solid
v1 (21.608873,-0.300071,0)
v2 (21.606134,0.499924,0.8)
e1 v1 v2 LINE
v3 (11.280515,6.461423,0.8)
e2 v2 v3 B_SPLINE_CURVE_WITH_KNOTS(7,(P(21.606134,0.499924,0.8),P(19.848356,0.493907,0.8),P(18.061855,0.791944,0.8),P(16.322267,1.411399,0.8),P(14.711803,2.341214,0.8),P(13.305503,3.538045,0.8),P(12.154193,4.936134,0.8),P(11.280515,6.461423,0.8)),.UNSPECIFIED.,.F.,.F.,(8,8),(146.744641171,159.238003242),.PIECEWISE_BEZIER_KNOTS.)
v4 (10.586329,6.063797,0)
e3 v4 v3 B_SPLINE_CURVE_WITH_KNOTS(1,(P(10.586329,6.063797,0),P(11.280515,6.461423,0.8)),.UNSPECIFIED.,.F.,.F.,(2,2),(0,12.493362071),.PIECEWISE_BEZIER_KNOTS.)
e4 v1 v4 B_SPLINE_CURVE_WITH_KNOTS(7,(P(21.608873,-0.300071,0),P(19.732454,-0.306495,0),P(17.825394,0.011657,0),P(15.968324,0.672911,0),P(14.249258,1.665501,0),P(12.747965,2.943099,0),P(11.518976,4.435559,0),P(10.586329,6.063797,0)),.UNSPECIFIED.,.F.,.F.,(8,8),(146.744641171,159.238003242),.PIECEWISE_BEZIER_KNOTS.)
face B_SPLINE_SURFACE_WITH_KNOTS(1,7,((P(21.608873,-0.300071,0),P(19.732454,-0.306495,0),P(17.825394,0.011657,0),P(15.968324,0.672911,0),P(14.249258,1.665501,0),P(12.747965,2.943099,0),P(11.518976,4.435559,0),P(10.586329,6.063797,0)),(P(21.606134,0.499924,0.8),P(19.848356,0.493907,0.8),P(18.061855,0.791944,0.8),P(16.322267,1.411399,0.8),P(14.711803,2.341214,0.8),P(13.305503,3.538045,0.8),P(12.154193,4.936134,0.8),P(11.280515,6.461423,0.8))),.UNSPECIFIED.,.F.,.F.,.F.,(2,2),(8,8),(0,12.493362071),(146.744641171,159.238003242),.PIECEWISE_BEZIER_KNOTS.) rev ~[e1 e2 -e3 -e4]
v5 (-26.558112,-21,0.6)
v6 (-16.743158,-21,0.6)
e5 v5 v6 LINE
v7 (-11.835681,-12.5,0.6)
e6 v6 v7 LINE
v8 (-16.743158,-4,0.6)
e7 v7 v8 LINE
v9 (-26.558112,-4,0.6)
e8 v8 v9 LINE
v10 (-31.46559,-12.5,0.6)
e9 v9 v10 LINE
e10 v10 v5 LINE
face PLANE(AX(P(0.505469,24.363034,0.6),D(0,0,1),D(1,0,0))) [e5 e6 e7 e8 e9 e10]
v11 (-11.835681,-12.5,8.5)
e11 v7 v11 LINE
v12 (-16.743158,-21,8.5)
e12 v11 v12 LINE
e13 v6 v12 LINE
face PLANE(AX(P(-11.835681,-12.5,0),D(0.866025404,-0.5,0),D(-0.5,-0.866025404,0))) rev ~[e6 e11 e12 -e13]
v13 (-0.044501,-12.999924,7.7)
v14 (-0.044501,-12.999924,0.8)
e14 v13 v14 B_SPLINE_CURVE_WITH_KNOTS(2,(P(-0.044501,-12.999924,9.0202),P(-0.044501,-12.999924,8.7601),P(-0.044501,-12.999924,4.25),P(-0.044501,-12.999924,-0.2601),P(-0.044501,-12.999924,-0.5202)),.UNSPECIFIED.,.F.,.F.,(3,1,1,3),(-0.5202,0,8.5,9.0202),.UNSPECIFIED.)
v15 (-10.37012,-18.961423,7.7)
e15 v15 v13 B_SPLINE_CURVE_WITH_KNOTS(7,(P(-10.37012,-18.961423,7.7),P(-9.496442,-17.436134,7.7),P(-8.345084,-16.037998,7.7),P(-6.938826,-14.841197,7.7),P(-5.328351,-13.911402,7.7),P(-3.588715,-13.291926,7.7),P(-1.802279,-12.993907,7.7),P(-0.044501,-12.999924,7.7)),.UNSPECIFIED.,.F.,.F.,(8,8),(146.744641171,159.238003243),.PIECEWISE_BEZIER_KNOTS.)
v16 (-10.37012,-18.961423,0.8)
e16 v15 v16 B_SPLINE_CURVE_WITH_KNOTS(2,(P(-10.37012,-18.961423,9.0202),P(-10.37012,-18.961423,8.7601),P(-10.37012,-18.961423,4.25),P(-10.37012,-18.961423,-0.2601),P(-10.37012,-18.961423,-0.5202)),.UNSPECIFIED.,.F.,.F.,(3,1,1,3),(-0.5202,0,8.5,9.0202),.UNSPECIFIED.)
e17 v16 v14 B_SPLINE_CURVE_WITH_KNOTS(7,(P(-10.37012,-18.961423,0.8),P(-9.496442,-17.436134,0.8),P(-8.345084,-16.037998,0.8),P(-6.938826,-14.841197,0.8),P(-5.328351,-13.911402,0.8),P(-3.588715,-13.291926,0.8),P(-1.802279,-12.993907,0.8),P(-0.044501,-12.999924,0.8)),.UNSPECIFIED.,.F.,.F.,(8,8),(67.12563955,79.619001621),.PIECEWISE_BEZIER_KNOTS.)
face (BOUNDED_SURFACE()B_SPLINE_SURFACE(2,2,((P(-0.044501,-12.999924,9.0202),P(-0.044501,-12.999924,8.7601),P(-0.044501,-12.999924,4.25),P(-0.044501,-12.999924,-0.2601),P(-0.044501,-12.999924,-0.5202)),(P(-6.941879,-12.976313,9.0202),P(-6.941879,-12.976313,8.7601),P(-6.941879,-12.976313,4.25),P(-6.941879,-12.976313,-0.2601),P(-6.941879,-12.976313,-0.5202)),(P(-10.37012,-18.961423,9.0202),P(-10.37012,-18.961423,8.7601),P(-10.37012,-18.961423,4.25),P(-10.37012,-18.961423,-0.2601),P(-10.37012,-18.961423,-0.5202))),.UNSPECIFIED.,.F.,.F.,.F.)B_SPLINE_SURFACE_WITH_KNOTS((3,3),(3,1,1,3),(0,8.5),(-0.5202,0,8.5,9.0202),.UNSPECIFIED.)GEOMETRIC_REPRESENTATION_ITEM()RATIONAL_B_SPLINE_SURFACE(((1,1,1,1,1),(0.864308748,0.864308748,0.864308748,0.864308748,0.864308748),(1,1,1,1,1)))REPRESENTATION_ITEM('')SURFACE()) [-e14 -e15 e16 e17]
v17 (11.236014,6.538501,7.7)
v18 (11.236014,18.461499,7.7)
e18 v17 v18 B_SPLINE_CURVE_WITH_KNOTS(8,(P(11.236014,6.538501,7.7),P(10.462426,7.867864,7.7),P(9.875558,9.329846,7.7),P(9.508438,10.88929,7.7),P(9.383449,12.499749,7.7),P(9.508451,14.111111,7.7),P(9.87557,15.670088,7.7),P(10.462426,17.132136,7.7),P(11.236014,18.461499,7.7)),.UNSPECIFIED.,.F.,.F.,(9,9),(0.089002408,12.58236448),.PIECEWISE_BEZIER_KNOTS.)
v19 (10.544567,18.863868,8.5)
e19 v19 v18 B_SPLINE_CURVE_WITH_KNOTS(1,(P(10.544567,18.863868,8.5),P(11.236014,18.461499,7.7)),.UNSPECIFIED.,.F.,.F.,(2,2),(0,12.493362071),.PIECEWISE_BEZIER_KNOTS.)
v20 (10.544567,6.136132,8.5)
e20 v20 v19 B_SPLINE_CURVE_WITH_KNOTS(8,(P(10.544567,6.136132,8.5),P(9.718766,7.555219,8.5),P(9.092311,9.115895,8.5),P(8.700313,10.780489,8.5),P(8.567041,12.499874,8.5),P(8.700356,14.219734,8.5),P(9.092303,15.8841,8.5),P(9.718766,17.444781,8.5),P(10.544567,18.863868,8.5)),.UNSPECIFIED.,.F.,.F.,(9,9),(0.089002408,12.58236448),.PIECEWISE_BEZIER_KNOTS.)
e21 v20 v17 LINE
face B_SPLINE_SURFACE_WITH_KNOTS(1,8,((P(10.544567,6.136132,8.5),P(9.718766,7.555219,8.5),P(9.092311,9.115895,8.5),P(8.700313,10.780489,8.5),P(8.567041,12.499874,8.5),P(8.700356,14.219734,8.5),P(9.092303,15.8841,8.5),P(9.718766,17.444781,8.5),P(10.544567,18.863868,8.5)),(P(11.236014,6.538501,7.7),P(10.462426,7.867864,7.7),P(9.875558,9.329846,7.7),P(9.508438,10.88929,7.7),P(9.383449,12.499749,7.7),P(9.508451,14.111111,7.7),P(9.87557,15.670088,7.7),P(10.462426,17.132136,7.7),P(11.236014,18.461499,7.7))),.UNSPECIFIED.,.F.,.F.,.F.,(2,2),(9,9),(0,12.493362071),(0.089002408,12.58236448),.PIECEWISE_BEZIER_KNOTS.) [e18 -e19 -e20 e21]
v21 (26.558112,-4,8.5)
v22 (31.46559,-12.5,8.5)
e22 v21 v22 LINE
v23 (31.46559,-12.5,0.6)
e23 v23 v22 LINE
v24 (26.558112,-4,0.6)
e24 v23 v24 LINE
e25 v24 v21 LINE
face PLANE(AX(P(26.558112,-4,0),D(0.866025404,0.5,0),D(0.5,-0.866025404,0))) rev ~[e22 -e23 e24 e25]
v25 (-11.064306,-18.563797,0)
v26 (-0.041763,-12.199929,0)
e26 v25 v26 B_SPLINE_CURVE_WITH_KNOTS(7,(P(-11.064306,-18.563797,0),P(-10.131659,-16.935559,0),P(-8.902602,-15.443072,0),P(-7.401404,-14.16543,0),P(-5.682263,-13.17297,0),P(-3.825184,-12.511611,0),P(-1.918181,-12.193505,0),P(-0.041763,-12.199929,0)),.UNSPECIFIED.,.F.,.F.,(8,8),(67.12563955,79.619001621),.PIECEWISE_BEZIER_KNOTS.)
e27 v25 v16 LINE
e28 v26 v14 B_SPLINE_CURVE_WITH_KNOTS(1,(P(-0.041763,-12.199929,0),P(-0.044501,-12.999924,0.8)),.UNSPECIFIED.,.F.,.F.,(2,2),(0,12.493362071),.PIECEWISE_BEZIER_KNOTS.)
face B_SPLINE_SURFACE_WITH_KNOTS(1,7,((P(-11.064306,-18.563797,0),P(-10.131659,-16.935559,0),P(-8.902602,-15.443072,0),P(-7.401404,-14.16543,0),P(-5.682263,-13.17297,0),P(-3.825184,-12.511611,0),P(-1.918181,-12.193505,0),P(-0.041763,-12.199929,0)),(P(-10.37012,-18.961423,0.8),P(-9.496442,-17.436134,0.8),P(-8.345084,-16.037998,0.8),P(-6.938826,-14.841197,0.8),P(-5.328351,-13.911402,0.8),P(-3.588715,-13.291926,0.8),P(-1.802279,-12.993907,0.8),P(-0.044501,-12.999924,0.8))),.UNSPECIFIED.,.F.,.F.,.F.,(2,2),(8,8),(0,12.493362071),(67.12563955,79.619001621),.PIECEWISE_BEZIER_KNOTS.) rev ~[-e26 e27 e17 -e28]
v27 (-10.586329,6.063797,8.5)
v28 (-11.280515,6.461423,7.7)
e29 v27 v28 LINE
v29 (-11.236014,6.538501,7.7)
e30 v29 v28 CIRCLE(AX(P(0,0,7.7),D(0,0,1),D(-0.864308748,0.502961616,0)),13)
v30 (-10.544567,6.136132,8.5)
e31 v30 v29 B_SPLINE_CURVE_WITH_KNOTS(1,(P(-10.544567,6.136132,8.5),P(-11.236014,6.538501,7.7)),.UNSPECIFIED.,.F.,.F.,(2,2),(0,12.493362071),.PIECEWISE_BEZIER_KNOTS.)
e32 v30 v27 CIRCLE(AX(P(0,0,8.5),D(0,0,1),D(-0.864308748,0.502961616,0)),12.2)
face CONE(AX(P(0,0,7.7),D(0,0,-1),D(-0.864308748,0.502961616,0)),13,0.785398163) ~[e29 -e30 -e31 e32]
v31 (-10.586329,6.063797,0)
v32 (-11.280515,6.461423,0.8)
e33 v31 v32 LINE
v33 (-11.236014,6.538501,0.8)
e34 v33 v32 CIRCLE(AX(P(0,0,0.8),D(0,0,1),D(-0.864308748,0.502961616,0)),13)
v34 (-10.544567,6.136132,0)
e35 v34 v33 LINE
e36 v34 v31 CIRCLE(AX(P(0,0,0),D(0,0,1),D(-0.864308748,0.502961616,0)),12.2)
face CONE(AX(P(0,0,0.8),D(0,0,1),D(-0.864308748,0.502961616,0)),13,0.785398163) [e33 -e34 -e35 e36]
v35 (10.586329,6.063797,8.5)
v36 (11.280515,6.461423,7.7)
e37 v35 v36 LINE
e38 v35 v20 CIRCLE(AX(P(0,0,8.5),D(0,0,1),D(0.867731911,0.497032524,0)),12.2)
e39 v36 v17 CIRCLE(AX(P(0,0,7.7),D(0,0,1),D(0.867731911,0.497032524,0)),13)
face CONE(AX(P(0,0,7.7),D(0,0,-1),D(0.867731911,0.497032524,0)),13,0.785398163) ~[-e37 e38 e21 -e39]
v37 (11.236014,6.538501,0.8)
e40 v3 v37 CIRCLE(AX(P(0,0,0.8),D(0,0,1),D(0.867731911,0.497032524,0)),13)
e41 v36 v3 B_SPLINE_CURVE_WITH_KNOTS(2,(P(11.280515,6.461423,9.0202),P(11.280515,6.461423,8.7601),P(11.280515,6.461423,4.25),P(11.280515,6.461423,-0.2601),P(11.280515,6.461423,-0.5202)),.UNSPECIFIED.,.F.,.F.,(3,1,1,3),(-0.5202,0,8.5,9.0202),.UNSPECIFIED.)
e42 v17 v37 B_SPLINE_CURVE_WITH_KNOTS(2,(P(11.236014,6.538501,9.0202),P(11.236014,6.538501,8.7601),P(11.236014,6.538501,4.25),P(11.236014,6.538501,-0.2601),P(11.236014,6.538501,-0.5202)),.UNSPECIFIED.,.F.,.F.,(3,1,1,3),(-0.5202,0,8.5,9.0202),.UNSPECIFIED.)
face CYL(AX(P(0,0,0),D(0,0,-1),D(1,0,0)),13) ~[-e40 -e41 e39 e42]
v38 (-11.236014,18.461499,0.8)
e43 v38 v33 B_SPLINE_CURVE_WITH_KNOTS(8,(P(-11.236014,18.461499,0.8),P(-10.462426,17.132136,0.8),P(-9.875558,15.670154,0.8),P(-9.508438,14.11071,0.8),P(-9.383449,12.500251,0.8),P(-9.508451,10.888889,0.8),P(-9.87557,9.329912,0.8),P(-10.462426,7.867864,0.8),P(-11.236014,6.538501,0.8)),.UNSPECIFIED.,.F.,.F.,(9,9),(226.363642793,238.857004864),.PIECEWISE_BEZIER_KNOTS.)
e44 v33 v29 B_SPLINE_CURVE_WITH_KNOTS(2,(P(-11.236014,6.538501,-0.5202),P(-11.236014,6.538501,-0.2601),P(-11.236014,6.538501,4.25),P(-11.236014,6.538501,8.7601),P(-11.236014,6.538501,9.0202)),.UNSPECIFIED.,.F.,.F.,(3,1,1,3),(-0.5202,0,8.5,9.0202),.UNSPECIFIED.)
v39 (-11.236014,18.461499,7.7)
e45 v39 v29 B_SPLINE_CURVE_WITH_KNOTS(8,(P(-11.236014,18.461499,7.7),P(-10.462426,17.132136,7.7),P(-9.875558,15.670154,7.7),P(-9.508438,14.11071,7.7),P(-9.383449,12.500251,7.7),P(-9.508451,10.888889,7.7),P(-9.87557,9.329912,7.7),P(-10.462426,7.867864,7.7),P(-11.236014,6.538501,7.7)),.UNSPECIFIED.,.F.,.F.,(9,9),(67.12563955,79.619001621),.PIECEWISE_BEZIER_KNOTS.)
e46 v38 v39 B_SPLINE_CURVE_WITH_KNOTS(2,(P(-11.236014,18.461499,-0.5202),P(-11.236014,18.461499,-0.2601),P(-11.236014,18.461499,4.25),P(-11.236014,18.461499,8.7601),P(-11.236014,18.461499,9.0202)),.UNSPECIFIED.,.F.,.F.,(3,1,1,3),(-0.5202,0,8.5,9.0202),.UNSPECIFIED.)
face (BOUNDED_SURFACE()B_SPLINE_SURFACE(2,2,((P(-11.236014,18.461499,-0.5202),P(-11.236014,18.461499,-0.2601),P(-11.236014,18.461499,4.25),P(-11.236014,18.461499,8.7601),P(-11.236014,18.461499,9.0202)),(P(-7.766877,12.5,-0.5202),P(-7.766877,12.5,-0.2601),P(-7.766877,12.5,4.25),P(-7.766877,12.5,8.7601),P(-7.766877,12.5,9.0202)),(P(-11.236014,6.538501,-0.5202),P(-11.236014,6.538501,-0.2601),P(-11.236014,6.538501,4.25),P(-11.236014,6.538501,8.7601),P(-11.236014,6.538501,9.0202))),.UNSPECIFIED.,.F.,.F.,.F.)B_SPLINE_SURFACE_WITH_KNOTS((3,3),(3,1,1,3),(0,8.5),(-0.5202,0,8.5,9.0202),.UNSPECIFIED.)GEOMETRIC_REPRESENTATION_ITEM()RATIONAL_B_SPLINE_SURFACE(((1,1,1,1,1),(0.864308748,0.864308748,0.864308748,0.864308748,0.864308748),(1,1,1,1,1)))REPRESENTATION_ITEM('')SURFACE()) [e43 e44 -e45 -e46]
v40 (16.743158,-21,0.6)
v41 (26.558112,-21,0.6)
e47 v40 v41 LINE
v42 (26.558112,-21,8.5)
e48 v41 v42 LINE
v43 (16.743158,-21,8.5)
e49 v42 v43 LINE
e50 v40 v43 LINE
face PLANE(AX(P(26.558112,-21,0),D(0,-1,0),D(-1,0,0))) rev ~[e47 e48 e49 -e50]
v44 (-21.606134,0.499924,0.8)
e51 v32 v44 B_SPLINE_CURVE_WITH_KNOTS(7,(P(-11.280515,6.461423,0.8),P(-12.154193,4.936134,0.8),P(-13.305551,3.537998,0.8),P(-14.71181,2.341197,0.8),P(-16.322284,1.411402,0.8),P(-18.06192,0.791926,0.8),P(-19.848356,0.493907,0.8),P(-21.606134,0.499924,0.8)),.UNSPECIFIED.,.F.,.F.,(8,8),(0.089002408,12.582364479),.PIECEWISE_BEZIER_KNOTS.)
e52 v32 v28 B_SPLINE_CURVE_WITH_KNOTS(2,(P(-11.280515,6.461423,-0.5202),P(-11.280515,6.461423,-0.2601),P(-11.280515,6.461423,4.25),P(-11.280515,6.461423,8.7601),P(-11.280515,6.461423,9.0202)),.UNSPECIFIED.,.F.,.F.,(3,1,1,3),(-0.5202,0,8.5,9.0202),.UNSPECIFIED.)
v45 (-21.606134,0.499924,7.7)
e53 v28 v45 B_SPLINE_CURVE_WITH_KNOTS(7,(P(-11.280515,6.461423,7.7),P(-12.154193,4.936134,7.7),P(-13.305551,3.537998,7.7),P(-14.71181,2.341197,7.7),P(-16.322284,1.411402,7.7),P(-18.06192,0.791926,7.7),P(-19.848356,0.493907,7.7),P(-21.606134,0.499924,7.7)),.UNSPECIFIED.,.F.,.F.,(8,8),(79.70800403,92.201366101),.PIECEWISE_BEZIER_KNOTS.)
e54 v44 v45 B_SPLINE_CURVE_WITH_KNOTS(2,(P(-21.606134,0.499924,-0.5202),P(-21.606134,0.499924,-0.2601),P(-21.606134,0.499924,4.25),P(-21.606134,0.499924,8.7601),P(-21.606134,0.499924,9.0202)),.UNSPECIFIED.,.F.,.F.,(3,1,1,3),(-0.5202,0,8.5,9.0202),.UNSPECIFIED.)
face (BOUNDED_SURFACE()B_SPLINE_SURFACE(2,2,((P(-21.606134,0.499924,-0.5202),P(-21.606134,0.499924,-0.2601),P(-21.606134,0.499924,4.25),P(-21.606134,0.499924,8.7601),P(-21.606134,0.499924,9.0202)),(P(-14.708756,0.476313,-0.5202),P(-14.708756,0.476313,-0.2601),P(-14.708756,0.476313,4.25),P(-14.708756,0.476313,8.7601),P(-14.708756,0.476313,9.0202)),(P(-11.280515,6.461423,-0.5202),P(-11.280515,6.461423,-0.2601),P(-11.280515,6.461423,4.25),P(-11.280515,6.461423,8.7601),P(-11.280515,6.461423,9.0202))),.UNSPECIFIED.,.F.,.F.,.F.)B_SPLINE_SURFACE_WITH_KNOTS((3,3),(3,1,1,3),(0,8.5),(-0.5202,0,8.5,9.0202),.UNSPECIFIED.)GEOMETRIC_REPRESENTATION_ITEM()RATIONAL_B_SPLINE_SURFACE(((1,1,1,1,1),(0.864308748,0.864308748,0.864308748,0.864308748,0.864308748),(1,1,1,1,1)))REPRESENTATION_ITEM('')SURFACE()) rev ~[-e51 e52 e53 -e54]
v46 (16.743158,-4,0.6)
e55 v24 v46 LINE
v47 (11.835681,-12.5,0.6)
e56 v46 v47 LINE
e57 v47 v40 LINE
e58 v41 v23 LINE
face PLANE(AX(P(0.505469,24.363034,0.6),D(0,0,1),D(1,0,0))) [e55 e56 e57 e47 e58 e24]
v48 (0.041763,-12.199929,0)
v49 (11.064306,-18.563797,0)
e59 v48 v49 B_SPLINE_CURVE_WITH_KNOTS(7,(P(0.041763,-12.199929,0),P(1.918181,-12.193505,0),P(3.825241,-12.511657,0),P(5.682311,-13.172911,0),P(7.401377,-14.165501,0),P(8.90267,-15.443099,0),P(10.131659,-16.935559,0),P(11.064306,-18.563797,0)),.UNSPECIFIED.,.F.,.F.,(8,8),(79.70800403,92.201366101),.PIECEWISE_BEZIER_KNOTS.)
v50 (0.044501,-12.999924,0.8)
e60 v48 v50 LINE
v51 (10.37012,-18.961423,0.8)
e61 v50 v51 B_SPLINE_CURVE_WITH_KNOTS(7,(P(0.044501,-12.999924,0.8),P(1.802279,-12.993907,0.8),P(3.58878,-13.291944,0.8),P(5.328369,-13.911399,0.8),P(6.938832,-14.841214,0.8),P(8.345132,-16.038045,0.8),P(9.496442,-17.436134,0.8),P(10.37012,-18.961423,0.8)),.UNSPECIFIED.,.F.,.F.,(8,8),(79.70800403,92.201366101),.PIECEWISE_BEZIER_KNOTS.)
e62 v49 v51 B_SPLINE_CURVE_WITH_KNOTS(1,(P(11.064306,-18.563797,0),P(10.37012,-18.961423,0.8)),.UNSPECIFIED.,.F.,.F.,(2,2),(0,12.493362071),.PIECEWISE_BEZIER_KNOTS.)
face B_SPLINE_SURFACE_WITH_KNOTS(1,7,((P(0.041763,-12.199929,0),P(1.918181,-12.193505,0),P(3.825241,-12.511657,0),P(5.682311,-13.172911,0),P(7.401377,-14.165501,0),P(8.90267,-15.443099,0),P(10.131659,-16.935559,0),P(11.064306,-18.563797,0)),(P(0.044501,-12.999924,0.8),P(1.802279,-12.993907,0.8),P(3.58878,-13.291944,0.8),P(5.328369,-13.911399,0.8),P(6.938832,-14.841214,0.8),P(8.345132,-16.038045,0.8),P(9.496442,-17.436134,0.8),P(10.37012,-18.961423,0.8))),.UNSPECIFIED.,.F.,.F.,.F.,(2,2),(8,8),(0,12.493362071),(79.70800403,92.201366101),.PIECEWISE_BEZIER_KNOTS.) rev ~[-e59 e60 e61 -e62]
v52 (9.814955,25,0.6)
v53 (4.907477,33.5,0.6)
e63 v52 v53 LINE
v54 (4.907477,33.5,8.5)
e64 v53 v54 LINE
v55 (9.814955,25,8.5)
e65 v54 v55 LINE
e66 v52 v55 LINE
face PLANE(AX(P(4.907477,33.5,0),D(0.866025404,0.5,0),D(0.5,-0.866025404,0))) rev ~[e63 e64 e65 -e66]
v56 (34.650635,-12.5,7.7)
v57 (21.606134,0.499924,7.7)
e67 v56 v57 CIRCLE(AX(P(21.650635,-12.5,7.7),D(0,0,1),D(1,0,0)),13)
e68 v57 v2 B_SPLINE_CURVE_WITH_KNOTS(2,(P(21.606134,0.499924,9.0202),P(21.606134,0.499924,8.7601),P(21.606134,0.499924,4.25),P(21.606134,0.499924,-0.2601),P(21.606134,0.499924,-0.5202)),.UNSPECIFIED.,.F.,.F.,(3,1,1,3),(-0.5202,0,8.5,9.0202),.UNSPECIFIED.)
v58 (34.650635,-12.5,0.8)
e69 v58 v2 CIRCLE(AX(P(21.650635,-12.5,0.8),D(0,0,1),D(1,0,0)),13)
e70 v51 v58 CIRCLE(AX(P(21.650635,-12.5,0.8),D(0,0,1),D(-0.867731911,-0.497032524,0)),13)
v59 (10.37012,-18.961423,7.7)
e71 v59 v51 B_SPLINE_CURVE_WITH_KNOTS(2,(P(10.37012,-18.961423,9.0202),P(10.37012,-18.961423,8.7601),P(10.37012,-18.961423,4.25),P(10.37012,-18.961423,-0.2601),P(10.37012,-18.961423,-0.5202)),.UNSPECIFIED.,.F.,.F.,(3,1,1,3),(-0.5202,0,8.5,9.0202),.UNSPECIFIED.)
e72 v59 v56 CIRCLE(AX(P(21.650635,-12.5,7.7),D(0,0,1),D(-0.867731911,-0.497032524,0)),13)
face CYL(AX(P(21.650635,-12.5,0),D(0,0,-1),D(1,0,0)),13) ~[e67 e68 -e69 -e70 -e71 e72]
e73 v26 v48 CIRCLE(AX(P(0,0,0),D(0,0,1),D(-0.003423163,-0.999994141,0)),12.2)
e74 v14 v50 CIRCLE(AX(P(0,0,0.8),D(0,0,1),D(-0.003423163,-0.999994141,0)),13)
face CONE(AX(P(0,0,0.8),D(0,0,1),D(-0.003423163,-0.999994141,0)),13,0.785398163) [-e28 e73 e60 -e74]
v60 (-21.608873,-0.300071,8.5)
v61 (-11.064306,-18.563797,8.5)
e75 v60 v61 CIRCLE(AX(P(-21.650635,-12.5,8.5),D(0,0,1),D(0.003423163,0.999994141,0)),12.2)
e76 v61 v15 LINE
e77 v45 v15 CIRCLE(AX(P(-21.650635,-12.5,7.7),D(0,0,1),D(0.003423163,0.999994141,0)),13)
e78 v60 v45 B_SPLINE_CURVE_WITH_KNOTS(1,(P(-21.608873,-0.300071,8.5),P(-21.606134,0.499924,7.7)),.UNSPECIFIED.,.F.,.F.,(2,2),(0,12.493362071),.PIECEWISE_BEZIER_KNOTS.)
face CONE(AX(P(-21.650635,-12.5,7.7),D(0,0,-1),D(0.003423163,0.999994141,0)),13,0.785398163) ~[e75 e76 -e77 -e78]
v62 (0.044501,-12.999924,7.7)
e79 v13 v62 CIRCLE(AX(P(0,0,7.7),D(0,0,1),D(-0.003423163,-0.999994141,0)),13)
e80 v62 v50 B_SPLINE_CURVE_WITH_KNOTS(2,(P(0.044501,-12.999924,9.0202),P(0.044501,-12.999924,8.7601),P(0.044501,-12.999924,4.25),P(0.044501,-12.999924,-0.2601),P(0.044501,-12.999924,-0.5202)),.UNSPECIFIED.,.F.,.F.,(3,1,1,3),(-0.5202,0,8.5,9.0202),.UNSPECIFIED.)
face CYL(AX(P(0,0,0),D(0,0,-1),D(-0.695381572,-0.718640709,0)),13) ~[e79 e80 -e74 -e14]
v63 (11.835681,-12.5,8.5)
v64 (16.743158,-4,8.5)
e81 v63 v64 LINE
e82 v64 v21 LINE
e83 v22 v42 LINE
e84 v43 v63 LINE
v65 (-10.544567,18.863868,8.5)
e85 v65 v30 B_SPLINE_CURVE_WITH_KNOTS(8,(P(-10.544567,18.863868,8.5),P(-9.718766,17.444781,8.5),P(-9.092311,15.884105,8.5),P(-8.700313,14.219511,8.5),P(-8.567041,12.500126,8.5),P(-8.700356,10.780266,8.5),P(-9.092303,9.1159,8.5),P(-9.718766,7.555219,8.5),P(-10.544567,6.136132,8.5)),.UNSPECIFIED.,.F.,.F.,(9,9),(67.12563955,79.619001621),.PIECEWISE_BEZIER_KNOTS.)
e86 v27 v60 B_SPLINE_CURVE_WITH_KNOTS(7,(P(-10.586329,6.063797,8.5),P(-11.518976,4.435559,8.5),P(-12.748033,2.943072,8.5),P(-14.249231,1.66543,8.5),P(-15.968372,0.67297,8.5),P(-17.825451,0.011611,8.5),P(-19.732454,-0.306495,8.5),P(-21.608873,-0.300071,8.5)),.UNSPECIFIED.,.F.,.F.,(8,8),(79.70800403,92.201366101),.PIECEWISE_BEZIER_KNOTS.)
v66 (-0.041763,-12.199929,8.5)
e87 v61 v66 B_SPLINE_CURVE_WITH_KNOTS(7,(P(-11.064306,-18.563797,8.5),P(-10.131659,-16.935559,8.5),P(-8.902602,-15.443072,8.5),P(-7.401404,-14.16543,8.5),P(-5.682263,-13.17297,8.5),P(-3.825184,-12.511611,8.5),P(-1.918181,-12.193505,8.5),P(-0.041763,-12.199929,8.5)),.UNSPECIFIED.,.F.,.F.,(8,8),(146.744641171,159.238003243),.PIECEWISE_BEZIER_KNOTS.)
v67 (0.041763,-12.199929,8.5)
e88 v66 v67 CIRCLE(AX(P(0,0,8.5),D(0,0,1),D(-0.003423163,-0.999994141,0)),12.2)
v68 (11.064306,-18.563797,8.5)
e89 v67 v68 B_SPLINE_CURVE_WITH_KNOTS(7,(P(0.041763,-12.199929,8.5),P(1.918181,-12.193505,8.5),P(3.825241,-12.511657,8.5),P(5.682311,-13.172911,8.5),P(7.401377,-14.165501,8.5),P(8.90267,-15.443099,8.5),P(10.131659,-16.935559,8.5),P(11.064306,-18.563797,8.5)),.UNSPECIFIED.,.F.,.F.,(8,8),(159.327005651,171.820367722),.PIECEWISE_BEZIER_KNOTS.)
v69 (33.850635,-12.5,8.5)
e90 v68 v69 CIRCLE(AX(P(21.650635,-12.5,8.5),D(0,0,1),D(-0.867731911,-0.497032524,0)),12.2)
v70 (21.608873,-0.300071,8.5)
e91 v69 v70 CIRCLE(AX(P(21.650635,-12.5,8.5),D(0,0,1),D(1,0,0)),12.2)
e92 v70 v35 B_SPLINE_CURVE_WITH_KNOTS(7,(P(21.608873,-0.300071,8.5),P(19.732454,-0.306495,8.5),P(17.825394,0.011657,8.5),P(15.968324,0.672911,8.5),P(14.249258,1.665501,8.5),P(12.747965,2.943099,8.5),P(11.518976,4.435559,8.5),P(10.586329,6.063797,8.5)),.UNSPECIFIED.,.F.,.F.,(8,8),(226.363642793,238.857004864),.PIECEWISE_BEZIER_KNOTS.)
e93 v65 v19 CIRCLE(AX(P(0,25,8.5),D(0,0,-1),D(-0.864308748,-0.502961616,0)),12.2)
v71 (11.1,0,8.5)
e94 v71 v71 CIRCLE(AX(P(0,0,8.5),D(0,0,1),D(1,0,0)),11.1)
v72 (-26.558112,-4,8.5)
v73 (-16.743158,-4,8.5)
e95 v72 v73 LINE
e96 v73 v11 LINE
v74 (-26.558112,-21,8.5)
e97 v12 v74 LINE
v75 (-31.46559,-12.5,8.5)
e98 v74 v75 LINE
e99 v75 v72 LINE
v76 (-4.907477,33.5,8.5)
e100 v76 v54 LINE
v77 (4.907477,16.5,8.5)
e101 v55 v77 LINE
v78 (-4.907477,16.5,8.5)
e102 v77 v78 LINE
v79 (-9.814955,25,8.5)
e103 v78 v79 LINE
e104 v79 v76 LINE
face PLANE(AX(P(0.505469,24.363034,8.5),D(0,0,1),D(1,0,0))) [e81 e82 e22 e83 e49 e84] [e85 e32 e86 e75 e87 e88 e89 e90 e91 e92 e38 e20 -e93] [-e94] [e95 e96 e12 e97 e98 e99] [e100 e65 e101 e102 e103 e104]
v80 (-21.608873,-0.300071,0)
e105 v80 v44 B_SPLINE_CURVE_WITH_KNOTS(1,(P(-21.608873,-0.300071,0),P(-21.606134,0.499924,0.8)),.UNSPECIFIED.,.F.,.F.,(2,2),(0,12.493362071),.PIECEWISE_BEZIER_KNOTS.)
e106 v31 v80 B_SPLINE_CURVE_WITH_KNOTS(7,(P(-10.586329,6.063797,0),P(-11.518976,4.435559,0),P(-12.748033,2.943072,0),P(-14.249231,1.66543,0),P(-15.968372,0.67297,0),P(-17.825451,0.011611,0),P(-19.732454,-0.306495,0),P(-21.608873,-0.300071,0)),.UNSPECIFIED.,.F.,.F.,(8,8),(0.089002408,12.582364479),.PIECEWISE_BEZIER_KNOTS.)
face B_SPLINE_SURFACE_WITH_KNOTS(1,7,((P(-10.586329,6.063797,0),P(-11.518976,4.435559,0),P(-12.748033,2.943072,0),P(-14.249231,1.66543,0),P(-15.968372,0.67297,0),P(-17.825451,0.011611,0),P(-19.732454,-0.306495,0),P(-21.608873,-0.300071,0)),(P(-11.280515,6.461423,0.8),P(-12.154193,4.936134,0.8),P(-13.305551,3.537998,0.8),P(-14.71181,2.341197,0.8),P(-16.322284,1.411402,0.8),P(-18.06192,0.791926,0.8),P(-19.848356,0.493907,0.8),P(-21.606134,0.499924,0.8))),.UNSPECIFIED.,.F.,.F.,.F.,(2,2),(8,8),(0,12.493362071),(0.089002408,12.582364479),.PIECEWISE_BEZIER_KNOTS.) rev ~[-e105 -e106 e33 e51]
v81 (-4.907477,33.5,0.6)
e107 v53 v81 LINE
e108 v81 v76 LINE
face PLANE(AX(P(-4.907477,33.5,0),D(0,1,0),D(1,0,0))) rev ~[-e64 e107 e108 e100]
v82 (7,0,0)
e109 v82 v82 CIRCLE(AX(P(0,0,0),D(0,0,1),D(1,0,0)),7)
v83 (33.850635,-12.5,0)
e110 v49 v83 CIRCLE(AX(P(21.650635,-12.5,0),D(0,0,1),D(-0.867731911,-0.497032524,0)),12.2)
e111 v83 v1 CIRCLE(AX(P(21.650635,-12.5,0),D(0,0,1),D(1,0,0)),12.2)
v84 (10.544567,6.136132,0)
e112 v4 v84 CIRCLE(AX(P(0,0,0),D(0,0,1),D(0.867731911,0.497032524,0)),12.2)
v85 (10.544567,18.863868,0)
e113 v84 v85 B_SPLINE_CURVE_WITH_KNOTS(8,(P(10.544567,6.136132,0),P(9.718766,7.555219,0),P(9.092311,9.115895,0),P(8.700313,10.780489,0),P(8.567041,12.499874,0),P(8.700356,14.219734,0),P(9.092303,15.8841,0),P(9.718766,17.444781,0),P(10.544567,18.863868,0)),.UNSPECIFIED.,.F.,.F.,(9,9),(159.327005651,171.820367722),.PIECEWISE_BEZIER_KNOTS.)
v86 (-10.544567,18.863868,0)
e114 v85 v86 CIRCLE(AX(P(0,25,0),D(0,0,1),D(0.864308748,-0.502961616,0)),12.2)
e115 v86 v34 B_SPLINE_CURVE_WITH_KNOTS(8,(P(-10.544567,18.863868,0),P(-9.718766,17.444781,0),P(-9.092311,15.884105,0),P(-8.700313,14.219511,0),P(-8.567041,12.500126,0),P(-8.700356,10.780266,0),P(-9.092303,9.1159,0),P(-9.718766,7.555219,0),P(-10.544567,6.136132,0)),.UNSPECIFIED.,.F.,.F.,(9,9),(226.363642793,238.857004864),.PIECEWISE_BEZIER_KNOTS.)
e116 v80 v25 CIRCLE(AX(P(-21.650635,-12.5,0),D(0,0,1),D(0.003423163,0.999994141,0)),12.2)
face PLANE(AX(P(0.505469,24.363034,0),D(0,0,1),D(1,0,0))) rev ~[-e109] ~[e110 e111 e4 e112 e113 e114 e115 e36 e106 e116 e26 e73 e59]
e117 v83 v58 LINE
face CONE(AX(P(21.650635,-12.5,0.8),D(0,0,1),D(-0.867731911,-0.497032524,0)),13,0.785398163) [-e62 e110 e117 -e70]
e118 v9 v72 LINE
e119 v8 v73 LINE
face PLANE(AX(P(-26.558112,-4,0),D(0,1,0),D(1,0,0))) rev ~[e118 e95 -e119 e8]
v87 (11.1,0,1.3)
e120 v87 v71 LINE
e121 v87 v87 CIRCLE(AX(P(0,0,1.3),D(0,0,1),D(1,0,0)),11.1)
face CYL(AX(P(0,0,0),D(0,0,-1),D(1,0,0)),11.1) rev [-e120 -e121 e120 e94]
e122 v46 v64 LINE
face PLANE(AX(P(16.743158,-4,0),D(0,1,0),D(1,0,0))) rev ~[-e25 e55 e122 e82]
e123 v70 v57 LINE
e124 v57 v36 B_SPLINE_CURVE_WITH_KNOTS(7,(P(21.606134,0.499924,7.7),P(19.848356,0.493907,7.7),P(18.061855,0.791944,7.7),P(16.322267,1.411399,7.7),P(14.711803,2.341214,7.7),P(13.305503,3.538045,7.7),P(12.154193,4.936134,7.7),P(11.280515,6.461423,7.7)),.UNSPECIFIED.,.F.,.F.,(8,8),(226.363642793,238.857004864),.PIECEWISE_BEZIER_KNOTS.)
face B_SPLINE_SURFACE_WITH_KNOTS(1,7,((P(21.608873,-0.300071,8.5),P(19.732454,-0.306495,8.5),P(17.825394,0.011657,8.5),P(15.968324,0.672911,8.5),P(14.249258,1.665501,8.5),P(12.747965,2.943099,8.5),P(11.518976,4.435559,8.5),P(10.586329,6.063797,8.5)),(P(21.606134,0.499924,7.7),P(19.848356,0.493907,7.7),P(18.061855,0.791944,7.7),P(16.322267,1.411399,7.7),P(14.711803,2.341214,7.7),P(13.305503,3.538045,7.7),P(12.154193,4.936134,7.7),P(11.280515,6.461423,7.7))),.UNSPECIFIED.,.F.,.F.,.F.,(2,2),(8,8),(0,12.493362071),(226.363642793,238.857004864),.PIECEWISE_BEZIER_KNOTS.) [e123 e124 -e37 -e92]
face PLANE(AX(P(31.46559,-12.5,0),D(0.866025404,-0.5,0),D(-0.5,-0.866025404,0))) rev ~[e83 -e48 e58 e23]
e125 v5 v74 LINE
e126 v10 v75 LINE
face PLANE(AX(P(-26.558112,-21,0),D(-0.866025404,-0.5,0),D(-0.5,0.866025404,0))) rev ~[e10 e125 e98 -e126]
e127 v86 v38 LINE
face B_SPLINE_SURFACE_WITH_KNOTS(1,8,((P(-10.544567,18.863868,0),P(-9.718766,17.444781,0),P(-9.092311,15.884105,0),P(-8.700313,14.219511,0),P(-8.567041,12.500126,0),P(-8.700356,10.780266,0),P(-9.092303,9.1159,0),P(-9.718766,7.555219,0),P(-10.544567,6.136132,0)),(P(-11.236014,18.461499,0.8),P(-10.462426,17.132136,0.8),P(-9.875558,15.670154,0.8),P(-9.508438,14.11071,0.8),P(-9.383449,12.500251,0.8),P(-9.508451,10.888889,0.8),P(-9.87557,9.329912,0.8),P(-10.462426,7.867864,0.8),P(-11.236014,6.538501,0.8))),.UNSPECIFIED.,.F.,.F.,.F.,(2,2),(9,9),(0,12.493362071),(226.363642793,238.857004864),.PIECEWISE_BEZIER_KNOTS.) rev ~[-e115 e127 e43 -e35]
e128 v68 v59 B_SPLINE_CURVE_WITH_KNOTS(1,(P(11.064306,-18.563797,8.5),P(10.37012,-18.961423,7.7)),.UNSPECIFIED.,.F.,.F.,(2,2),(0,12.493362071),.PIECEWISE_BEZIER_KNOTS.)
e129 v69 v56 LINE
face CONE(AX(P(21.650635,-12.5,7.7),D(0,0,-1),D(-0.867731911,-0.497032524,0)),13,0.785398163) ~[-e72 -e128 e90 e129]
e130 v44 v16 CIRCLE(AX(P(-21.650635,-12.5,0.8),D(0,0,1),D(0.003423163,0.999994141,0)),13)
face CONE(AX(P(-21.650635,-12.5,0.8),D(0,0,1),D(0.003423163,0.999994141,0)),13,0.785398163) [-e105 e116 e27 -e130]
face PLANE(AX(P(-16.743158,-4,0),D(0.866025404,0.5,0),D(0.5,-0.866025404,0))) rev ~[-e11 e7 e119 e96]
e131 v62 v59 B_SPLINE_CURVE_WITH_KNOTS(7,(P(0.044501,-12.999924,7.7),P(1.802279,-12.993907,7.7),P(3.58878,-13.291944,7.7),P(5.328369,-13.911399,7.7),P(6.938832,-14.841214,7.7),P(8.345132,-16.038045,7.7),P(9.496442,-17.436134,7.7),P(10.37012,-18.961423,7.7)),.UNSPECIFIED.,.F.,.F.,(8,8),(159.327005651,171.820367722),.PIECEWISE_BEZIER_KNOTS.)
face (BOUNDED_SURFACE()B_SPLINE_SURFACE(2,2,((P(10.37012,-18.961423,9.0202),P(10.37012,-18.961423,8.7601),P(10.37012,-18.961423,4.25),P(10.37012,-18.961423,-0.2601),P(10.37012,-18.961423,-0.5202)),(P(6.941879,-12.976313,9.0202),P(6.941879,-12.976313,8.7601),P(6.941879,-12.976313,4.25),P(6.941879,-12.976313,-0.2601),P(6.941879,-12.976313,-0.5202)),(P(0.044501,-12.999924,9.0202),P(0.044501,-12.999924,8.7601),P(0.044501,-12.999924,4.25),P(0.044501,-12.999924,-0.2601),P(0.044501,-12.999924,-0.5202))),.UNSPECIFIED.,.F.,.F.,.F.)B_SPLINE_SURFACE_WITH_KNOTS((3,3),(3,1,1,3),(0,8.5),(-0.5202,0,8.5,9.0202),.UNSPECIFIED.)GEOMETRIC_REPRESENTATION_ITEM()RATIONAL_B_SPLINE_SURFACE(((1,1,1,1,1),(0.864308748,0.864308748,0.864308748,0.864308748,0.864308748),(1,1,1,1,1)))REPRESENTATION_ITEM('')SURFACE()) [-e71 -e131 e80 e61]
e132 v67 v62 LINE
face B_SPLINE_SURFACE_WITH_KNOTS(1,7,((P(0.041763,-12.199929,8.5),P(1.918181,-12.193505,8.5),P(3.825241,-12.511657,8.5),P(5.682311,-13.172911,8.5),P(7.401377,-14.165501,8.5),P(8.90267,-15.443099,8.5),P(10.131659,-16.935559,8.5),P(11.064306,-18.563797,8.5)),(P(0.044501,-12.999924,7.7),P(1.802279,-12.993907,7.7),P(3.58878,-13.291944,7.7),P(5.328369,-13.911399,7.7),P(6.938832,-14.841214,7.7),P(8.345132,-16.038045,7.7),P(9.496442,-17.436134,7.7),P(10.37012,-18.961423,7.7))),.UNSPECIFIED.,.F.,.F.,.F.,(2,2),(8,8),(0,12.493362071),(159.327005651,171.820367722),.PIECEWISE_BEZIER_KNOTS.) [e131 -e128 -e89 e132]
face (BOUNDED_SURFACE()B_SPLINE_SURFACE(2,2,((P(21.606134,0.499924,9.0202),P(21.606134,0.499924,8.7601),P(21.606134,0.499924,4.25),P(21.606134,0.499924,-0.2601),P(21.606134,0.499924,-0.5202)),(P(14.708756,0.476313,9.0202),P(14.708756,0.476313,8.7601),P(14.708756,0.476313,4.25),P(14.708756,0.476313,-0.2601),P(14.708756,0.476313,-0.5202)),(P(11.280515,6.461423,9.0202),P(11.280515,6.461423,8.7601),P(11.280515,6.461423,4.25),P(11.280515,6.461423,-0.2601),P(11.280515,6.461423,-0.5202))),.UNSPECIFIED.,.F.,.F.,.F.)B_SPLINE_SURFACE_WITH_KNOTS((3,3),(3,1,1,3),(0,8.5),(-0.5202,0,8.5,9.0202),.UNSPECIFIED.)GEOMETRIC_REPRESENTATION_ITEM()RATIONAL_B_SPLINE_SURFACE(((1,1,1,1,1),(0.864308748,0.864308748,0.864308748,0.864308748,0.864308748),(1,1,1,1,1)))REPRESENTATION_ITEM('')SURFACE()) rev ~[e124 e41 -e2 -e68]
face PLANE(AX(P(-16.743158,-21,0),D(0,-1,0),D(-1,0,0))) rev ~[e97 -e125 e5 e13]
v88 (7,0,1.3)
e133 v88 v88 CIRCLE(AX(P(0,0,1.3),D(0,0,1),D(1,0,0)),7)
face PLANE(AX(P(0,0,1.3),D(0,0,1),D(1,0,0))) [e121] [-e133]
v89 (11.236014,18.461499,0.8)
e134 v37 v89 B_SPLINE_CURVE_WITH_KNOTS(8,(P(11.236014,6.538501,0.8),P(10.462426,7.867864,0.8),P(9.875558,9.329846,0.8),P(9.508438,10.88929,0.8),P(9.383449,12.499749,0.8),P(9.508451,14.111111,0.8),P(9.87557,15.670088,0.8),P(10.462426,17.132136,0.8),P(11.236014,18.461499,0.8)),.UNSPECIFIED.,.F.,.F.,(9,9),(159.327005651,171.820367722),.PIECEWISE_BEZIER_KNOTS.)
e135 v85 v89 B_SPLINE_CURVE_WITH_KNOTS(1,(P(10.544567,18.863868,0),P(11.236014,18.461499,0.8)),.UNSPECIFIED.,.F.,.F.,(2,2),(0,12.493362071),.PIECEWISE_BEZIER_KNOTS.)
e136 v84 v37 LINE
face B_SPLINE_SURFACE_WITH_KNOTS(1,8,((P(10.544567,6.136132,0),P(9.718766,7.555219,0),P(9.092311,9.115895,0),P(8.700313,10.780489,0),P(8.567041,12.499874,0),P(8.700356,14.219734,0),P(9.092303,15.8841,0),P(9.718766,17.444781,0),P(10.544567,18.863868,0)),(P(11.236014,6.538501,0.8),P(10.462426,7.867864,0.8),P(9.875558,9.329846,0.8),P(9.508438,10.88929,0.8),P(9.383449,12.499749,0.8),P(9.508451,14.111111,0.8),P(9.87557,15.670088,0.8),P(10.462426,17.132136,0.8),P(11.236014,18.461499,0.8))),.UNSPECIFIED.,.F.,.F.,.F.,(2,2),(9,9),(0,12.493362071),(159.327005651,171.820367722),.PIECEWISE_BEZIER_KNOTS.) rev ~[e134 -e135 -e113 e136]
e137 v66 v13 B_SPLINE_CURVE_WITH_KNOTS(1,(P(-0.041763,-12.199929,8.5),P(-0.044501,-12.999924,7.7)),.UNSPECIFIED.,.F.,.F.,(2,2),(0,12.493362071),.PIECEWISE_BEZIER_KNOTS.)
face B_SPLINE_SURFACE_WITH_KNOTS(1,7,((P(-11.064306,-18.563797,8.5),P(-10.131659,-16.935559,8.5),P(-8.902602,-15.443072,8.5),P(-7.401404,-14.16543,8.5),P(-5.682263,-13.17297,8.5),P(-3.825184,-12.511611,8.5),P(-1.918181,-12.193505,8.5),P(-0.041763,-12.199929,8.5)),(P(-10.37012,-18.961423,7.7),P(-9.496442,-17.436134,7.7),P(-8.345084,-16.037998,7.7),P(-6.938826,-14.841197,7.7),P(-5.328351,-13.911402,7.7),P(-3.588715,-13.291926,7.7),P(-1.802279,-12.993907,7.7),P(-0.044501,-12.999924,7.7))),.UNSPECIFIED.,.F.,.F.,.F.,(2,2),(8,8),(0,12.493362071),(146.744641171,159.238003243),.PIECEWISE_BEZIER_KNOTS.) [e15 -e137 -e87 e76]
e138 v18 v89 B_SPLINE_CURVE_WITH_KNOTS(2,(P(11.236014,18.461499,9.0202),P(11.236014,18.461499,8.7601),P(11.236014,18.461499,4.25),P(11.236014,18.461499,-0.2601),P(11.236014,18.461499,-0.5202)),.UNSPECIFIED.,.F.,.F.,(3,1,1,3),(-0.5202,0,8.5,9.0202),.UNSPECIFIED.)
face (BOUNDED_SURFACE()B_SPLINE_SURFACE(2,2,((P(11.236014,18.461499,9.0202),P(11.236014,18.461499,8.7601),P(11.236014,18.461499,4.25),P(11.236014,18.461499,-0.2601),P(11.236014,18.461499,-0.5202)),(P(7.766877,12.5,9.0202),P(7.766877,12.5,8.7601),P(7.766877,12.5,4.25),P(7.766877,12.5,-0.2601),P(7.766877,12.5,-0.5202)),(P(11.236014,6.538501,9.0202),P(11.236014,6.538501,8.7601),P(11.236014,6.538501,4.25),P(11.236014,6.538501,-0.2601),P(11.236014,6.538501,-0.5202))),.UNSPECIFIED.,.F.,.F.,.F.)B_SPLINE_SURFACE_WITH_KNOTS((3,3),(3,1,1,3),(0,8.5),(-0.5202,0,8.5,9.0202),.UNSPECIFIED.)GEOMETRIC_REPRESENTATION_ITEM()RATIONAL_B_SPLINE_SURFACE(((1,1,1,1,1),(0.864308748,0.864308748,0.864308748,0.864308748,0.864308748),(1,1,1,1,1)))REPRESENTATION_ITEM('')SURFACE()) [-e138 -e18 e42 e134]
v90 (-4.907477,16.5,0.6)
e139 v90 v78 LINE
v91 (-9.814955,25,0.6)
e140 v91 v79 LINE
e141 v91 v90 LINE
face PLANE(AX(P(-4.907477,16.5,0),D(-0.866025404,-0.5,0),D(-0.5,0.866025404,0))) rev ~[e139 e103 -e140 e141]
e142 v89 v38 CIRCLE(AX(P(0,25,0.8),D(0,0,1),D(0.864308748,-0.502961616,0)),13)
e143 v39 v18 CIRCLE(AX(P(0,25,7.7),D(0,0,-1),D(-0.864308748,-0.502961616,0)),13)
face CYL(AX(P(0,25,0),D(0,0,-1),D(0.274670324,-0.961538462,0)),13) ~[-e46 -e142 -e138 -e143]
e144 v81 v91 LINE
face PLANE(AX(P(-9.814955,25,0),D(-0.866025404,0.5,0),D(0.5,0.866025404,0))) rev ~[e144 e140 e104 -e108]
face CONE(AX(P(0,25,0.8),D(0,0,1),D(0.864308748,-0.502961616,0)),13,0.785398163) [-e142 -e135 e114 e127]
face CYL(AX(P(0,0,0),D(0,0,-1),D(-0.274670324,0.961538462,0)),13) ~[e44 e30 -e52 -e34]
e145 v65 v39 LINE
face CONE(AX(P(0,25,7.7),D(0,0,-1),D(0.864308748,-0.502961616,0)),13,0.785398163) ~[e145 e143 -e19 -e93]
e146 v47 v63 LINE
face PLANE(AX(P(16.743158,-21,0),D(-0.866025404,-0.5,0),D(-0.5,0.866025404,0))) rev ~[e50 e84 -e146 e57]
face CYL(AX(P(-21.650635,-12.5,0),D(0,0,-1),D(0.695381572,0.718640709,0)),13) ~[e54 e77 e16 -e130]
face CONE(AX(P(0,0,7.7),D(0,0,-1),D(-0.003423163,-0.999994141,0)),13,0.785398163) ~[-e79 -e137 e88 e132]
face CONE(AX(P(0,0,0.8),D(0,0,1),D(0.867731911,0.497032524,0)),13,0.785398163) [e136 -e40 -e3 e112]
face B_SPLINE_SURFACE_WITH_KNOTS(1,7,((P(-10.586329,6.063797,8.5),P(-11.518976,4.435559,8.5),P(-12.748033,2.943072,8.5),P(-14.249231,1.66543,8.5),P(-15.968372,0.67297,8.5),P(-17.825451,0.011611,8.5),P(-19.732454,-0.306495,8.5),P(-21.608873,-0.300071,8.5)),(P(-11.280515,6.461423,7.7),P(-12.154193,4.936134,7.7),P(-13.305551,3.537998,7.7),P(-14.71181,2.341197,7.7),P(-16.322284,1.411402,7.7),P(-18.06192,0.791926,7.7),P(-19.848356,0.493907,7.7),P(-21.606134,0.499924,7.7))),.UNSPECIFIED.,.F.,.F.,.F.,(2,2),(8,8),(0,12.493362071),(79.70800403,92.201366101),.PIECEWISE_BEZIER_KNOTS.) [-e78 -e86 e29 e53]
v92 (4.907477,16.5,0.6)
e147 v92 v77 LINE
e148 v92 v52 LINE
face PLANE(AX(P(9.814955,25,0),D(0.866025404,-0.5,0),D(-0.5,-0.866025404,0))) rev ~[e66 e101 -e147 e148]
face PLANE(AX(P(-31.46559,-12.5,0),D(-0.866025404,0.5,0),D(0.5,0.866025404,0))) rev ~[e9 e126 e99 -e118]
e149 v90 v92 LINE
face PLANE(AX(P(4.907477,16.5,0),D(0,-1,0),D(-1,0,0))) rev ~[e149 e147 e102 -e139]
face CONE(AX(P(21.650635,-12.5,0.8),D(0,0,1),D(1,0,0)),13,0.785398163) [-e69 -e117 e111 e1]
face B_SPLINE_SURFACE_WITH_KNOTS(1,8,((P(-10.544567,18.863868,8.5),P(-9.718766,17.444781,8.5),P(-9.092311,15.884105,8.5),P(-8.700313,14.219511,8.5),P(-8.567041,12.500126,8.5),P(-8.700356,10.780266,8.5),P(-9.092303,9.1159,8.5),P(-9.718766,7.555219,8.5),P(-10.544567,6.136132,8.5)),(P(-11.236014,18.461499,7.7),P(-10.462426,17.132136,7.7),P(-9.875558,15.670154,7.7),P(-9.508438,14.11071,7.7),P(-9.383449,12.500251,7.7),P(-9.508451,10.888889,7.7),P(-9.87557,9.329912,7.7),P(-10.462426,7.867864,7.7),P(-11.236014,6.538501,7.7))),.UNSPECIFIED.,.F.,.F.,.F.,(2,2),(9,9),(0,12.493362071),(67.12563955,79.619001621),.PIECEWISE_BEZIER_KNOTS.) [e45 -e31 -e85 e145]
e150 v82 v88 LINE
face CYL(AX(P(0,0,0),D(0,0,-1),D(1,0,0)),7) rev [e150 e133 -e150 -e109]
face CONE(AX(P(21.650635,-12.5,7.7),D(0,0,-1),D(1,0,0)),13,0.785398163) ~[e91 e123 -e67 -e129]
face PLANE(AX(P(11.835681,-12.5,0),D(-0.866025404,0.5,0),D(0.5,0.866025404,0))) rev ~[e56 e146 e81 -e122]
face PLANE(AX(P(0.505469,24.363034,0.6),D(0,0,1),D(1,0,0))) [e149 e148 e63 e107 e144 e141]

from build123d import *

# Parameters (mm, degrees)
F0_R     = 11.1
F0_R_2   = 7
F1_DEPTH = 0.6
F2_DEPTH = 8.5
F3_R     = 11.8527911282
F4_SIZE  = 0.8
F5_DEPTH = 1.3


# Not quite as in the source:
# - a feature names something its author has since deleted; it is built from what else it names


with BuildPart() as f1:
    # F0 (on Top) → F1 (new body)
    with BuildSketch(Plane.XY):
        with BuildLine():
            ThreePointArc((-3.5707142143, 12.5), (0, 13), (3.5707142143, 12.5))
            ThreePointArc((3.5707142143, 12.5), (10.3783256064, 17.1711841504), (13, 25))
            ThreePointArc((13, 25), (-7.8288158496, 35.3783256064), (-3.5707142143, 12.5))
        make_face()
        Polygon((4.9074772881, 33.5), (9.8149545762, 25), (4.9074772881, 16.5), (-4.9074772881, 16.5), (-9.8149545762, 25), (-4.9074772881, 33.5), align=None, mode=Mode.SUBTRACT)
        with BuildLine():
            ThreePointArc((-9.0399604402, -9.3423292192), (-11.2583302492, -6.5), (-12.6106746544, -3.1576707808))
            ThreePointArc((-12.6106746544, -3.1576707808), (-33.6197513051, -17.5734856991), (-8.6506350946, -12.5))
            ThreePointArc((-8.6506350946, -12.5), (-8.7483335459, -10.9092093959), (-9.0399604402, -9.3423292192))
        make_face()
        Polygon((-26.5581123827, -4), (-16.7431578065, -4), (-11.8356805184, -12.5), (-16.7431578065, -21), (-26.5581123827, -21), (-31.4655896708, -12.5), align=None, mode=Mode.SUBTRACT)
        with BuildLine():
            ThreePointArc((34.6506350946, -12.5), (26.7241207937, -0.5308837895), (12.6106746544, -3.1576707808))
            ThreePointArc((12.6106746544, -3.1576707808), (11.2583302492, -6.5), (9.0399604402, -9.3423292192))
            ThreePointArc((9.0399604402, -9.3423292192), (20.0598444905, -25.4023015487), (34.6506350946, -12.5))
        make_face()
        Polygon((16.7431578065, -21), (11.8356805184, -12.5), (16.7431578065, -4), (26.5581123827, -4), (31.4655896708, -12.5), (26.5581123827, -21), align=None, mode=Mode.SUBTRACT)
        with BuildLine():
            ThreePointArc((12.6106746544, -3.1576707808), (12.9023015487, -1.5907906041), (13, 0))
            ThreePointArc((13, 0), (10.3783256064, 7.8288158496), (3.5707142143, 12.5))
            ThreePointArc((3.5707142143, 12.5), (0, 12), (-3.5707142143, 12.5))
            ThreePointArc((-3.5707142143, 12.5), (-11.2583302492, 6.5), (-12.6106746544, -3.1576707808))
            ThreePointArc((-12.6106746544, -3.1576707808), (-10.3923048454, -6), (-9.0399604402, -9.3423292192))
            ThreePointArc((-9.0399604402, -9.3423292192), (0, -13), (9.0399604402, -9.3423292192))
            ThreePointArc((9.0399604402, -9.3423292192), (10.3923048454, -6), (12.6106746544, -3.1576707808))
        make_face()
        Circle(F0_R, mode=Mode.SUBTRACT)
        Circle(F0_R)
        Circle(F0_R_2, mode=Mode.SUBTRACT)
        Polygon((4.9074772881, 16.5), (9.8149545762, 25), (4.9074772881, 33.5), (-4.9074772881, 33.5), (-9.8149545762, 25), (-4.9074772881, 16.5), align=None)
        Polygon((-11.8356805184, -12.5), (-16.7431578065, -4), (-26.5581123827, -4), (-31.4655896708, -12.5), (-26.5581123827, -21), (-16.7431578065, -21), align=None)
        Polygon((16.7431578065, -4), (11.8356805184, -12.5), (16.7431578065, -21), (26.5581123827, -21), (31.4655896708, -12.5), (26.5581123827, -4), align=None)
        with BuildLine():
            ThreePointArc((-3.5707142143, 12.5), (0, 12), (3.5707142143, 12.5))
            ThreePointArc((3.5707142143, 12.5), (0, 13), (-3.5707142143, 12.5))
        make_face()
        with BuildLine():
            ThreePointArc((-9.0399604402, -9.3423292192), (-10.3923048454, -6), (-12.6106746544, -3.1576707808))
            ThreePointArc((-12.6106746544, -3.1576707808), (-11.2583302492, -6.5), (-9.0399604402, -9.3423292192))
        make_face()
        with BuildLine():
            ThreePointArc((9.0399604402, -9.3423292192), (11.2583302492, -6.5), (12.6106746544, -3.1576707808))
            ThreePointArc((12.6106746544, -3.1576707808), (10.3923048454, -6), (9.0399604402, -9.3423292192))
        make_face()
    extrude(amount=F1_DEPTH)

    # F0 (on Top) → F2 (join)
    with BuildSketch(Plane.XY):
        with BuildLine():
            ThreePointArc((-3.5707142143, 12.5), (0, 13), (3.5707142143, 12.5))
            ThreePointArc((3.5707142143, 12.5), (10.3783256064, 17.1711841504), (13, 25))
            ThreePointArc((13, 25), (-7.8288158496, 35.3783256064), (-3.5707142143, 12.5))
        make_face()
        Polygon((4.9074772881, 33.5), (9.8149545762, 25), (4.9074772881, 16.5), (-4.9074772881, 16.5), (-9.8149545762, 25), (-4.9074772881, 33.5), align=None, mode=Mode.SUBTRACT)
        with BuildLine():
            ThreePointArc((12.6106746544, -3.1576707808), (12.9023015487, -1.5907906041), (13, 0))
            ThreePointArc((13, 0), (10.3783256064, 7.8288158496), (3.5707142143, 12.5))
            ThreePointArc((3.5707142143, 12.5), (0, 12), (-3.5707142143, 12.5))
            ThreePointArc((-3.5707142143, 12.5), (-11.2583302492, 6.5), (-12.6106746544, -3.1576707808))
            ThreePointArc((-12.6106746544, -3.1576707808), (-10.3923048454, -6), (-9.0399604402, -9.3423292192))
            ThreePointArc((-9.0399604402, -9.3423292192), (0, -13), (9.0399604402, -9.3423292192))
            ThreePointArc((9.0399604402, -9.3423292192), (10.3923048454, -6), (12.6106746544, -3.1576707808))
        make_face()
        Circle(F0_R, mode=Mode.SUBTRACT)
        with BuildLine():
            ThreePointArc((-3.5707142143, 12.5), (0, 12), (3.5707142143, 12.5))
            ThreePointArc((3.5707142143, 12.5), (0, 13), (-3.5707142143, 12.5))
        make_face()
        with BuildLine():
            ThreePointArc((-9.0399604402, -9.3423292192), (-11.2583302492, -6.5), (-12.6106746544, -3.1576707808))
            ThreePointArc((-12.6106746544, -3.1576707808), (-33.6197513051, -17.5734856991), (-8.6506350946, -12.5))
            ThreePointArc((-8.6506350946, -12.5), (-8.7483335459, -10.9092093959), (-9.0399604402, -9.3423292192))
        make_face()
        Polygon((-26.5581123827, -4), (-16.7431578065, -4), (-11.8356805184, -12.5), (-16.7431578065, -21), (-26.5581123827, -21), (-31.4655896708, -12.5), align=None, mode=Mode.SUBTRACT)
        with BuildLine():
            ThreePointArc((-9.0399604402, -9.3423292192), (-10.3923048454, -6), (-12.6106746544, -3.1576707808))
            ThreePointArc((-12.6106746544, -3.1576707808), (-11.2583302492, -6.5), (-9.0399604402, -9.3423292192))
        make_face()
        with BuildLine():
            ThreePointArc((34.6506350946, -12.5), (26.7241207937, -0.5308837895), (12.6106746544, -3.1576707808))
            ThreePointArc((12.6106746544, -3.1576707808), (11.2583302492, -6.5), (9.0399604402, -9.3423292192))
            ThreePointArc((9.0399604402, -9.3423292192), (20.0598444905, -25.4023015487), (34.6506350946, -12.5))
        make_face()
        Polygon((16.7431578065, -21), (11.8356805184, -12.5), (16.7431578065, -4), (26.5581123827, -4), (31.4655896708, -12.5), (26.5581123827, -21), align=None, mode=Mode.SUBTRACT)
        with BuildLine():
            ThreePointArc((9.0399604402, -9.3423292192), (11.2583302492, -6.5), (12.6106746544, -3.1576707808))
            ThreePointArc((12.6106746544, -3.1576707808), (10.3923048454, -6), (9.0399604402, -9.3423292192))
        make_face()
    extrude(amount=F2_DEPTH)

    # F3
    f3_edges = [f1.edges().sort_by_distance(p)[0] for p in [
        (3.570714, 12.5, 4.25),
        (-3.570714, 12.5, 4.25),
        (-12.610675, -3.157671, 4.25),
        (-9.03996, -9.342329, 4.25),
        (9.03996, -9.342329, 4.25),
        (12.610675, -3.157671, 4.25),
    ]]
    fillet(f3_edges, radius=F3_R)

    # F4
    f4_edges = [f1.edges().sort_by_distance(p)[0] for p in [
        (11.25833, 6.5, 8.5),
        (9.627694, 12.5, 8.5),
        (0, 38, 8.5),
        (-9.627694, 12.5, 8.5),
        (-11.25833, 6.5, 8.5),
        (-11.25833, 6.5, 0),
        (-9.627694, 12.5, 0),
        (0, 38, 0),
        (9.627694, 12.5, 0),
        (11.25833, 6.5, 0),
        (15.639164, 2.087827, 8.5),
        (-15.639164, 2.087827, 8.5),
        (32.908965, -19, 8.5),
        (-32.908965, -19, 8.5),
        (6.011471, -14.587827, 8.5),
        (-6.011471, -14.587827, 8.5),
        (0, -13, 8.5),
        (15.639164, 2.087827, 0),
        (-15.639164, 2.087827, 0),
        (32.908965, -19, 0),
        (-32.908965, -19, 0),
        (6.011471, -14.587827, 0),
        (-6.011471, -14.587827, 0),
        (0, -13, 0),
    ]]
    chamfer(f4_edges, length=F4_SIZE)

    # F0 (on Top) → F5 (join)
    with BuildSketch(Plane.XY):
        Circle(F0_R)
        Circle(F0_R_2, mode=Mode.SUBTRACT)
    extrude(amount=F5_DEPTH)


solid = f1.part
